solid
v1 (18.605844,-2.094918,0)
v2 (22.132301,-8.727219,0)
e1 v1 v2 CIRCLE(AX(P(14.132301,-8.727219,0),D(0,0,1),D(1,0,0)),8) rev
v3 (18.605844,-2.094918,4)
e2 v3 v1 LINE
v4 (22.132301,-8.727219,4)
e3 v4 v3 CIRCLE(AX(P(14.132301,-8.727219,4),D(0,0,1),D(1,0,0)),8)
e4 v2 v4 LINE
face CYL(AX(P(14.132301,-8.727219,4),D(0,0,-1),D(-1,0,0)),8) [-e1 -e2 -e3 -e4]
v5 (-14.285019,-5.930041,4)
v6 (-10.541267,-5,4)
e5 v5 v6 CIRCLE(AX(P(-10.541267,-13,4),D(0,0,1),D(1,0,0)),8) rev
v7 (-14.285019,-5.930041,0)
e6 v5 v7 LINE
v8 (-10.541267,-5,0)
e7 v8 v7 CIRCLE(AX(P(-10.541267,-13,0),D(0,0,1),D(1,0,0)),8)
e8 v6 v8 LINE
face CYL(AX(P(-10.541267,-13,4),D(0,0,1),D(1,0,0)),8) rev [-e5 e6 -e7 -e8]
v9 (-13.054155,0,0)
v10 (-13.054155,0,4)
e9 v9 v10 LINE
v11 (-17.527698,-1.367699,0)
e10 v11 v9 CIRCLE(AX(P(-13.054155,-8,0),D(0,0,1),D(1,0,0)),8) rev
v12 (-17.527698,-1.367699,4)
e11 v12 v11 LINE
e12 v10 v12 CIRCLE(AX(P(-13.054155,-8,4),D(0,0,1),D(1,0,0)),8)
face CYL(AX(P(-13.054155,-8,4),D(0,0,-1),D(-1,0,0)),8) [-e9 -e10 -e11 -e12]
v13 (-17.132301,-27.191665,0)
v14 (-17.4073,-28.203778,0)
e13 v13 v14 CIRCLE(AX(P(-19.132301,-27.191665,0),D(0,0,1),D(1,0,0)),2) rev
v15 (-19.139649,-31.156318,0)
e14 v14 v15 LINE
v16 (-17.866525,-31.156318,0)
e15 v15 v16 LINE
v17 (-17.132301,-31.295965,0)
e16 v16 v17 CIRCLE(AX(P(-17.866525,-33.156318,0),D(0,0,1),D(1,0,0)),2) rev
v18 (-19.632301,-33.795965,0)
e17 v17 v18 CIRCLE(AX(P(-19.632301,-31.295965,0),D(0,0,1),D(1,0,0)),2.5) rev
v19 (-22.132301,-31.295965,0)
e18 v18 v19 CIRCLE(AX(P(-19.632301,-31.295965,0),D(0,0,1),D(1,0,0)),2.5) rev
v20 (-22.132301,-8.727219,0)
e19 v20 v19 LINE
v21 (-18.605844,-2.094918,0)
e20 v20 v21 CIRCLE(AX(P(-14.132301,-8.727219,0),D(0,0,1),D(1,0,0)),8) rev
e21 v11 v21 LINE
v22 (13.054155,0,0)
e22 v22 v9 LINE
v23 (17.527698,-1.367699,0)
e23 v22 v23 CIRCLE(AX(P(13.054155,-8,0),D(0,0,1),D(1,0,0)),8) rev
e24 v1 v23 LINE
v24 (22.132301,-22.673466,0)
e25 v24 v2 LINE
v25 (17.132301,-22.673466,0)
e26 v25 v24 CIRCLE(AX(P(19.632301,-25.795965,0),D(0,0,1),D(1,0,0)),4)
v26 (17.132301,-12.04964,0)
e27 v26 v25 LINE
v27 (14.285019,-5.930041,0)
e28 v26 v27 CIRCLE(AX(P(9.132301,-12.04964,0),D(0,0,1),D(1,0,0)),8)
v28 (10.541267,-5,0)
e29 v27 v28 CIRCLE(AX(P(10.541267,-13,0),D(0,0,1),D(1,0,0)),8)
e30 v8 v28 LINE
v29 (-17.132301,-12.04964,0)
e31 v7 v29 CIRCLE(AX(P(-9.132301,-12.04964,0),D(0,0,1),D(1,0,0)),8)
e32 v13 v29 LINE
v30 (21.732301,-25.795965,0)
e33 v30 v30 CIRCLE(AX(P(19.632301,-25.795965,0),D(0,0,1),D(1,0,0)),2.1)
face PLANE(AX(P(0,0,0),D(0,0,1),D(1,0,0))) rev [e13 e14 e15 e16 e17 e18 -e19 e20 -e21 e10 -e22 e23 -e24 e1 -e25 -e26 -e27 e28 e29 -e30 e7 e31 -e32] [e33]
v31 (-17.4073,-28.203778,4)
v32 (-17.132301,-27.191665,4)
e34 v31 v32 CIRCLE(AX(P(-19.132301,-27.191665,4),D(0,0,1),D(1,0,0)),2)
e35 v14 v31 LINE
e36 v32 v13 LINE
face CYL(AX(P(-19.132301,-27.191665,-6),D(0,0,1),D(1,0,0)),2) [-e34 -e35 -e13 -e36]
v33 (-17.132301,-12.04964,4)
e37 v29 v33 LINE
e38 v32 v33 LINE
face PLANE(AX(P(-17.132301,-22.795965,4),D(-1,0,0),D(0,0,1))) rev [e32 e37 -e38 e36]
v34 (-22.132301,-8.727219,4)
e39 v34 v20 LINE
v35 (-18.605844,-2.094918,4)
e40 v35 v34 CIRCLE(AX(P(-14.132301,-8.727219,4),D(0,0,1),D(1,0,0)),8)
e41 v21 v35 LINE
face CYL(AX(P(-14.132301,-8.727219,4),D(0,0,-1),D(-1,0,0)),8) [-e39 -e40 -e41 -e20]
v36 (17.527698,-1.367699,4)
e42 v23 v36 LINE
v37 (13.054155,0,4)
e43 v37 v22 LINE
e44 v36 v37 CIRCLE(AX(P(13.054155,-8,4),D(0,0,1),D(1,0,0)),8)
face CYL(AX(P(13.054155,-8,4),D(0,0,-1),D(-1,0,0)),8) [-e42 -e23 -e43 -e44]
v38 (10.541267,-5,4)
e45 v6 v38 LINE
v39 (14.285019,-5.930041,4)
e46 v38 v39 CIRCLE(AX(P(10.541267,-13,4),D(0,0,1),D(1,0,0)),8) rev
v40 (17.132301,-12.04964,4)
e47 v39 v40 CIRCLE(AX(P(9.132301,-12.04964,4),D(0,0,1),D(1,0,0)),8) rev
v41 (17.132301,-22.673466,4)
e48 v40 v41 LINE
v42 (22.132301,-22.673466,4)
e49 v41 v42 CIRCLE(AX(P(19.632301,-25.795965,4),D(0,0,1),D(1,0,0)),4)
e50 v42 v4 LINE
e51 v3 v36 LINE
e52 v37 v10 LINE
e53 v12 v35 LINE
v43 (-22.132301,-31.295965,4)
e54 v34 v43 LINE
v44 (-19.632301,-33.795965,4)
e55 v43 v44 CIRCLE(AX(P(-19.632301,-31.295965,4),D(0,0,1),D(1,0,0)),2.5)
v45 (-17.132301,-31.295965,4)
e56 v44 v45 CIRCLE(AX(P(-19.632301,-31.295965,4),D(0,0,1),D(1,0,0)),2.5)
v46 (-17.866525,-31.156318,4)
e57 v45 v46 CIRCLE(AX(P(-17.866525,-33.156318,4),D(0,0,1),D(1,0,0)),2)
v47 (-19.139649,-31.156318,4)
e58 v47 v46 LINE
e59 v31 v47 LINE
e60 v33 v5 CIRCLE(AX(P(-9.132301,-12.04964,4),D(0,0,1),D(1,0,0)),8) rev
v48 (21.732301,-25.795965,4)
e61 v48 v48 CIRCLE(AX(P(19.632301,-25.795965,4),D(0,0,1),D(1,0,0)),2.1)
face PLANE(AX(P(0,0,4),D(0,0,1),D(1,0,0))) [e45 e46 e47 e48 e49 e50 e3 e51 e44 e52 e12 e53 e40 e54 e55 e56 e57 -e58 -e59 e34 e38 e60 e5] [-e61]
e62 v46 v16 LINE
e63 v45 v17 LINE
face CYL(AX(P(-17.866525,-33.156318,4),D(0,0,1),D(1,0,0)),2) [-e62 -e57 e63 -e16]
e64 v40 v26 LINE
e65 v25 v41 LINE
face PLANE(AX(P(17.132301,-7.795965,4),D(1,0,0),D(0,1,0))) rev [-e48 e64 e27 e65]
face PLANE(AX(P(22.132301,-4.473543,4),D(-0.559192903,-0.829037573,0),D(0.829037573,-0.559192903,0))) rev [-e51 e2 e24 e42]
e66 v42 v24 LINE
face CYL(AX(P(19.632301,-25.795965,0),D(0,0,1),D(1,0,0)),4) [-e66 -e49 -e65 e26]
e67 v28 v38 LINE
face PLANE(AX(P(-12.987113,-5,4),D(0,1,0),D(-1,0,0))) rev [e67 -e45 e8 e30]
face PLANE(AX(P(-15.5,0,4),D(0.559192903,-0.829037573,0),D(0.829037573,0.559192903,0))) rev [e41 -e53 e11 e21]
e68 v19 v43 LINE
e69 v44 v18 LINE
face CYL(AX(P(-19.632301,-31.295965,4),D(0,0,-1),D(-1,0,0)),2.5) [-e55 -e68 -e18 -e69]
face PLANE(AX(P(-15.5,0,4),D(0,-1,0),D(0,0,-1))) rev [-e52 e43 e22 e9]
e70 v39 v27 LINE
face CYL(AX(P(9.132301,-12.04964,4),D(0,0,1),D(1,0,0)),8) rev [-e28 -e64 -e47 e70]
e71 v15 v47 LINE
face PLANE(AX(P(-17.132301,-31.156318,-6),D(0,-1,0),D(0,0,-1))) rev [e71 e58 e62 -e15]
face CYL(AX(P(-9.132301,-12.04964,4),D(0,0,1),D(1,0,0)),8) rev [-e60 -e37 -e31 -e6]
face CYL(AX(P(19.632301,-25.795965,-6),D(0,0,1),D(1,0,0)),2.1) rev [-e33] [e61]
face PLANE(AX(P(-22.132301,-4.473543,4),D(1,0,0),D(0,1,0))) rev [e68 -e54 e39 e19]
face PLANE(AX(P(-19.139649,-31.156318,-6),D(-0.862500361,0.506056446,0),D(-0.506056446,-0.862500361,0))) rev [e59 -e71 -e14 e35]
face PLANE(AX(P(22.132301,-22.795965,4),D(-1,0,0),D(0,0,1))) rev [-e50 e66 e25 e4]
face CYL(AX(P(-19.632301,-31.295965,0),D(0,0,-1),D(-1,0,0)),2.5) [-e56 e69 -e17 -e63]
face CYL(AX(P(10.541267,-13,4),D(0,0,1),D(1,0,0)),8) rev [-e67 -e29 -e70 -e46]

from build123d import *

# Parameters (mm, degrees)
SALIENTE_EXTRUIR4_DEPTH = 4
REDONDEO1_R             = 8
CROQUIS4_R              = 4
SALIENTE_EXTRUIR5_DEPTH = 4
CROQUIS5_R              = 2.1
CORTAR_EXTRUIR1_DEPTH   = 10
CROQUIS6_W              = 5
CROQUIS6_H              = 11
SALIENTE_EXTRUIR6_DEPTH = 4
REDONDEO2_R             = 2.5
CORTAR_EXTRUIR3_DEPTH   = 10
REDONDEO5_R             = 2
REDONDEO6_R             = 2


# Some blends are built 0.0001 mm under size
with BuildPart() as part:
    # Croquis3 → Saliente-Extruir4 (new body)
    with BuildSketch(Plane.XY):
        Polygon((-15.5, 0), (15.5, 0), (22.13230058, -4.473543228), (22.13230058, -22.795964517), (17.13230058, -22.795964517), (17.13230058, -7.795964517), (12.987112718, -5), (-12.987112718, -5), (-17.13230058, -7.795964517), (-17.13230058, -22.795964517), (-22.13230058, -22.795964517), (-22.13230058, -4.473543228), align=None)
    extrude(amount=SALIENTE_EXTRUIR4_DEPTH)

    # Redondeo1
    # the kernel refuses this fillet: 8 mm, written as the material it adds along each edge
    with BuildSketch(Plane(origin=(-12.987112718, -5, 0), x_dir=(1, 0, 0), z_dir=(0, 0, 1)), Plane(origin=(12.987112718, -5, 0), x_dir=(0.8290375725550433, -0.5591929034707446, 0), z_dir=(0, 0, 1))) as redondeo1_piece_1:
        with BuildLine():
            CenterArc((REDONDEO1_R * 0.305730681459, -REDONDEO1_R), REDONDEO1_R, 90, 34)
            Line((-REDONDEO1_R * 0.253462222012, -REDONDEO1_R * 0.170962427445), (0, 0))
            Line((0, 0), (REDONDEO1_R * 0.305730681459, 0))
        make_face()
    extrude(amount=4)
    with BuildSketch(Plane(origin=(-17.13230058, -7.795964517, 0), x_dir=(0.8290375725550426, 0.5591929034707452, 0), z_dir=(0, 0, 1)), Plane(origin=(17.13230058, -7.795964517, 0), x_dir=(0, -1, 0), z_dir=(0, 0, 1))) as redondeo1_piece_2:
        with BuildLine():
            CenterArc((REDONDEO1_R * 0.531709431661, -REDONDEO1_R), REDONDEO1_R, 90, 56)
            Line((-REDONDEO1_R * 0.297328140894, -REDONDEO1_R * 0.440807096529), (0, 0))
            Line((0, 0), (REDONDEO1_R * 0.531709431661, 0))
        make_face()
    extrude(amount=4)
    # the kernel refuses this fillet: 8 mm, written as the material it takes off along each edge
    with BuildSketch(Plane(origin=(22.13230058, -4.473543228, -10.634188633), x_dir=(-0.8290375725550431, 0.5591929034707448, 0), z_dir=(0, 0, 1))) as redondeo1_2_piece_1:
        with BuildLine():
            CenterArc((REDONDEO1_R * 0.531709431661, REDONDEO1_R), REDONDEO1_R, 214, 56)
            Line((-REDONDEO1_R * 0.297328140894, REDONDEO1_R * 0.440807096529), (0, 0))
            Line((0, 0), (REDONDEO1_R * 0.531709431661, 0))
        make_face()
    extrude(amount=25.268377266, mode=Mode.SUBTRACT)
    with BuildSketch(Plane(origin=(15.5, 0, -6.114613629), x_dir=(-1, 0, 0), z_dir=(0, 0, 1))) as redondeo1_2_piece_2:
        with BuildLine():
            CenterArc((REDONDEO1_R * 0.305730681459, REDONDEO1_R), REDONDEO1_R, 236, 34)
            Line((-REDONDEO1_R * 0.253462222012, REDONDEO1_R * 0.170962427445), (0, 0))
            Line((0, 0), (REDONDEO1_R * 0.305730681459, 0))
        make_face()
    extrude(amount=16.229227258, mode=Mode.SUBTRACT)
    with BuildSketch(Plane(origin=(-15.5, 0, -6.114613629), x_dir=(1, 0, 0), z_dir=(0, 0, 1))) as redondeo1_2_piece_3:
        with BuildLine():
            CenterArc((REDONDEO1_R * 0.305730681459, -REDONDEO1_R), REDONDEO1_R, 90, 34)
            Line((-REDONDEO1_R * 0.253462222012, -REDONDEO1_R * 0.170962427445), (0, 0))
            Line((0, 0), (REDONDEO1_R * 0.305730681459, 0))
        make_face()
    extrude(amount=16.229227258, mode=Mode.SUBTRACT)
    with BuildSketch(Plane(origin=(-22.13230058, -4.473543228, -10.634188633), x_dir=(0.8290375725550428, 0.5591929034707449, 0), z_dir=(0, 0, 1))) as redondeo1_2_piece_4:
        with BuildLine():
            CenterArc((REDONDEO1_R * 0.531709431661, -REDONDEO1_R), REDONDEO1_R, 90, 56)
            Line((-REDONDEO1_R * 0.297328140894, -REDONDEO1_R * 0.440807096529), (0, 0))
            Line((0, 0), (REDONDEO1_R * 0.531709431661, 0))
        make_face()
    extrude(amount=25.268377266, mode=Mode.SUBTRACT)

    # Croquis4 → Saliente-Extruir5 (add, through all)
    with BuildSketch(Plane.XY.offset(4)):
        with Locations((19.63230058, -25.795964517)):
            Circle(CROQUIS4_R)
    extrude(amount=-SALIENTE_EXTRUIR5_DEPTH)

    # Croquis5 → Cortar-Extruir1 (cut)
    with BuildSketch(Plane.XY.offset(4)):
        with Locations((19.63230058, -25.795964517)):
            Circle(CROQUIS5_R)
    extrude(amount=-CORTAR_EXTRUIR1_DEPTH, mode=Mode.SUBTRACT)

    # Croquis6 → Saliente-Extruir6 (add, through all)
    with BuildSketch(Plane.XY.offset(4)):
        with Locations((-19.63230058, -28.295964517)):
            Rectangle(CROQUIS6_W, CROQUIS6_H)
    extrude(amount=-SALIENTE_EXTRUIR6_DEPTH)

    # Redondeo2
    redondeo2_edges = [part.edges().sort_by_distance(p)[0] for p in [
        (-17.13230058, -33.795964517, 2),
        (-22.13230058, -33.795964517, 2),
    ]]
    fillet(redondeo2_edges, radius=REDONDEO2_R - 0.0001)  # a hair under: the kernel refuses the full size

    # Croquis8 → Cortar-Extruir3 (cut)
    with BuildSketch(Plane.XY.offset(4)):
        Polygon((-17.13230058, -31.156317686), (-19.139649056, -31.156317686), (-17.13230058, -27.735081186), align=None)
    extrude(amount=-CORTAR_EXTRUIR3_DEPTH, mode=Mode.SUBTRACT)

    # Redondeo5
    redondeo5_edges = [part.edges().sort_by_distance(p)[0] for p in [
        (-17.13230058, -27.735081186, 2),
    ]]
    fillet(redondeo5_edges, radius=REDONDEO5_R)

    # Redondeo6
    # the kernel refuses this fillet: 2 mm, written as the material it takes off along each edge
    with BuildSketch(Plane(origin=(-17.13230058, -31.156317686, 5.83619537), x_dir=(-1, 0, 0), z_dir=(0, 0, -1))) as redondeo6_piece_1:
        with BuildLine():
            CenterArc((0.734478148, -2), REDONDEO6_R, 90, 21.545444272)
            Line((0, -0.139746832), (-0.014689563, -0.102541768))
            ThreePointArc((-0.014689563, -0.102541768), (-0.04, -0.069873416), (-0.04, 0))
            Line((-0.04, 0), (0, 0.04))
            Line((0, 0.04), (0.734478148, 0.04))
            Line((0.734478148, 0.04), (0.734478148, 0))
        make_face()
    extrude(amount=7.672390741, mode=Mode.SUBTRACT)


solid = part.part
